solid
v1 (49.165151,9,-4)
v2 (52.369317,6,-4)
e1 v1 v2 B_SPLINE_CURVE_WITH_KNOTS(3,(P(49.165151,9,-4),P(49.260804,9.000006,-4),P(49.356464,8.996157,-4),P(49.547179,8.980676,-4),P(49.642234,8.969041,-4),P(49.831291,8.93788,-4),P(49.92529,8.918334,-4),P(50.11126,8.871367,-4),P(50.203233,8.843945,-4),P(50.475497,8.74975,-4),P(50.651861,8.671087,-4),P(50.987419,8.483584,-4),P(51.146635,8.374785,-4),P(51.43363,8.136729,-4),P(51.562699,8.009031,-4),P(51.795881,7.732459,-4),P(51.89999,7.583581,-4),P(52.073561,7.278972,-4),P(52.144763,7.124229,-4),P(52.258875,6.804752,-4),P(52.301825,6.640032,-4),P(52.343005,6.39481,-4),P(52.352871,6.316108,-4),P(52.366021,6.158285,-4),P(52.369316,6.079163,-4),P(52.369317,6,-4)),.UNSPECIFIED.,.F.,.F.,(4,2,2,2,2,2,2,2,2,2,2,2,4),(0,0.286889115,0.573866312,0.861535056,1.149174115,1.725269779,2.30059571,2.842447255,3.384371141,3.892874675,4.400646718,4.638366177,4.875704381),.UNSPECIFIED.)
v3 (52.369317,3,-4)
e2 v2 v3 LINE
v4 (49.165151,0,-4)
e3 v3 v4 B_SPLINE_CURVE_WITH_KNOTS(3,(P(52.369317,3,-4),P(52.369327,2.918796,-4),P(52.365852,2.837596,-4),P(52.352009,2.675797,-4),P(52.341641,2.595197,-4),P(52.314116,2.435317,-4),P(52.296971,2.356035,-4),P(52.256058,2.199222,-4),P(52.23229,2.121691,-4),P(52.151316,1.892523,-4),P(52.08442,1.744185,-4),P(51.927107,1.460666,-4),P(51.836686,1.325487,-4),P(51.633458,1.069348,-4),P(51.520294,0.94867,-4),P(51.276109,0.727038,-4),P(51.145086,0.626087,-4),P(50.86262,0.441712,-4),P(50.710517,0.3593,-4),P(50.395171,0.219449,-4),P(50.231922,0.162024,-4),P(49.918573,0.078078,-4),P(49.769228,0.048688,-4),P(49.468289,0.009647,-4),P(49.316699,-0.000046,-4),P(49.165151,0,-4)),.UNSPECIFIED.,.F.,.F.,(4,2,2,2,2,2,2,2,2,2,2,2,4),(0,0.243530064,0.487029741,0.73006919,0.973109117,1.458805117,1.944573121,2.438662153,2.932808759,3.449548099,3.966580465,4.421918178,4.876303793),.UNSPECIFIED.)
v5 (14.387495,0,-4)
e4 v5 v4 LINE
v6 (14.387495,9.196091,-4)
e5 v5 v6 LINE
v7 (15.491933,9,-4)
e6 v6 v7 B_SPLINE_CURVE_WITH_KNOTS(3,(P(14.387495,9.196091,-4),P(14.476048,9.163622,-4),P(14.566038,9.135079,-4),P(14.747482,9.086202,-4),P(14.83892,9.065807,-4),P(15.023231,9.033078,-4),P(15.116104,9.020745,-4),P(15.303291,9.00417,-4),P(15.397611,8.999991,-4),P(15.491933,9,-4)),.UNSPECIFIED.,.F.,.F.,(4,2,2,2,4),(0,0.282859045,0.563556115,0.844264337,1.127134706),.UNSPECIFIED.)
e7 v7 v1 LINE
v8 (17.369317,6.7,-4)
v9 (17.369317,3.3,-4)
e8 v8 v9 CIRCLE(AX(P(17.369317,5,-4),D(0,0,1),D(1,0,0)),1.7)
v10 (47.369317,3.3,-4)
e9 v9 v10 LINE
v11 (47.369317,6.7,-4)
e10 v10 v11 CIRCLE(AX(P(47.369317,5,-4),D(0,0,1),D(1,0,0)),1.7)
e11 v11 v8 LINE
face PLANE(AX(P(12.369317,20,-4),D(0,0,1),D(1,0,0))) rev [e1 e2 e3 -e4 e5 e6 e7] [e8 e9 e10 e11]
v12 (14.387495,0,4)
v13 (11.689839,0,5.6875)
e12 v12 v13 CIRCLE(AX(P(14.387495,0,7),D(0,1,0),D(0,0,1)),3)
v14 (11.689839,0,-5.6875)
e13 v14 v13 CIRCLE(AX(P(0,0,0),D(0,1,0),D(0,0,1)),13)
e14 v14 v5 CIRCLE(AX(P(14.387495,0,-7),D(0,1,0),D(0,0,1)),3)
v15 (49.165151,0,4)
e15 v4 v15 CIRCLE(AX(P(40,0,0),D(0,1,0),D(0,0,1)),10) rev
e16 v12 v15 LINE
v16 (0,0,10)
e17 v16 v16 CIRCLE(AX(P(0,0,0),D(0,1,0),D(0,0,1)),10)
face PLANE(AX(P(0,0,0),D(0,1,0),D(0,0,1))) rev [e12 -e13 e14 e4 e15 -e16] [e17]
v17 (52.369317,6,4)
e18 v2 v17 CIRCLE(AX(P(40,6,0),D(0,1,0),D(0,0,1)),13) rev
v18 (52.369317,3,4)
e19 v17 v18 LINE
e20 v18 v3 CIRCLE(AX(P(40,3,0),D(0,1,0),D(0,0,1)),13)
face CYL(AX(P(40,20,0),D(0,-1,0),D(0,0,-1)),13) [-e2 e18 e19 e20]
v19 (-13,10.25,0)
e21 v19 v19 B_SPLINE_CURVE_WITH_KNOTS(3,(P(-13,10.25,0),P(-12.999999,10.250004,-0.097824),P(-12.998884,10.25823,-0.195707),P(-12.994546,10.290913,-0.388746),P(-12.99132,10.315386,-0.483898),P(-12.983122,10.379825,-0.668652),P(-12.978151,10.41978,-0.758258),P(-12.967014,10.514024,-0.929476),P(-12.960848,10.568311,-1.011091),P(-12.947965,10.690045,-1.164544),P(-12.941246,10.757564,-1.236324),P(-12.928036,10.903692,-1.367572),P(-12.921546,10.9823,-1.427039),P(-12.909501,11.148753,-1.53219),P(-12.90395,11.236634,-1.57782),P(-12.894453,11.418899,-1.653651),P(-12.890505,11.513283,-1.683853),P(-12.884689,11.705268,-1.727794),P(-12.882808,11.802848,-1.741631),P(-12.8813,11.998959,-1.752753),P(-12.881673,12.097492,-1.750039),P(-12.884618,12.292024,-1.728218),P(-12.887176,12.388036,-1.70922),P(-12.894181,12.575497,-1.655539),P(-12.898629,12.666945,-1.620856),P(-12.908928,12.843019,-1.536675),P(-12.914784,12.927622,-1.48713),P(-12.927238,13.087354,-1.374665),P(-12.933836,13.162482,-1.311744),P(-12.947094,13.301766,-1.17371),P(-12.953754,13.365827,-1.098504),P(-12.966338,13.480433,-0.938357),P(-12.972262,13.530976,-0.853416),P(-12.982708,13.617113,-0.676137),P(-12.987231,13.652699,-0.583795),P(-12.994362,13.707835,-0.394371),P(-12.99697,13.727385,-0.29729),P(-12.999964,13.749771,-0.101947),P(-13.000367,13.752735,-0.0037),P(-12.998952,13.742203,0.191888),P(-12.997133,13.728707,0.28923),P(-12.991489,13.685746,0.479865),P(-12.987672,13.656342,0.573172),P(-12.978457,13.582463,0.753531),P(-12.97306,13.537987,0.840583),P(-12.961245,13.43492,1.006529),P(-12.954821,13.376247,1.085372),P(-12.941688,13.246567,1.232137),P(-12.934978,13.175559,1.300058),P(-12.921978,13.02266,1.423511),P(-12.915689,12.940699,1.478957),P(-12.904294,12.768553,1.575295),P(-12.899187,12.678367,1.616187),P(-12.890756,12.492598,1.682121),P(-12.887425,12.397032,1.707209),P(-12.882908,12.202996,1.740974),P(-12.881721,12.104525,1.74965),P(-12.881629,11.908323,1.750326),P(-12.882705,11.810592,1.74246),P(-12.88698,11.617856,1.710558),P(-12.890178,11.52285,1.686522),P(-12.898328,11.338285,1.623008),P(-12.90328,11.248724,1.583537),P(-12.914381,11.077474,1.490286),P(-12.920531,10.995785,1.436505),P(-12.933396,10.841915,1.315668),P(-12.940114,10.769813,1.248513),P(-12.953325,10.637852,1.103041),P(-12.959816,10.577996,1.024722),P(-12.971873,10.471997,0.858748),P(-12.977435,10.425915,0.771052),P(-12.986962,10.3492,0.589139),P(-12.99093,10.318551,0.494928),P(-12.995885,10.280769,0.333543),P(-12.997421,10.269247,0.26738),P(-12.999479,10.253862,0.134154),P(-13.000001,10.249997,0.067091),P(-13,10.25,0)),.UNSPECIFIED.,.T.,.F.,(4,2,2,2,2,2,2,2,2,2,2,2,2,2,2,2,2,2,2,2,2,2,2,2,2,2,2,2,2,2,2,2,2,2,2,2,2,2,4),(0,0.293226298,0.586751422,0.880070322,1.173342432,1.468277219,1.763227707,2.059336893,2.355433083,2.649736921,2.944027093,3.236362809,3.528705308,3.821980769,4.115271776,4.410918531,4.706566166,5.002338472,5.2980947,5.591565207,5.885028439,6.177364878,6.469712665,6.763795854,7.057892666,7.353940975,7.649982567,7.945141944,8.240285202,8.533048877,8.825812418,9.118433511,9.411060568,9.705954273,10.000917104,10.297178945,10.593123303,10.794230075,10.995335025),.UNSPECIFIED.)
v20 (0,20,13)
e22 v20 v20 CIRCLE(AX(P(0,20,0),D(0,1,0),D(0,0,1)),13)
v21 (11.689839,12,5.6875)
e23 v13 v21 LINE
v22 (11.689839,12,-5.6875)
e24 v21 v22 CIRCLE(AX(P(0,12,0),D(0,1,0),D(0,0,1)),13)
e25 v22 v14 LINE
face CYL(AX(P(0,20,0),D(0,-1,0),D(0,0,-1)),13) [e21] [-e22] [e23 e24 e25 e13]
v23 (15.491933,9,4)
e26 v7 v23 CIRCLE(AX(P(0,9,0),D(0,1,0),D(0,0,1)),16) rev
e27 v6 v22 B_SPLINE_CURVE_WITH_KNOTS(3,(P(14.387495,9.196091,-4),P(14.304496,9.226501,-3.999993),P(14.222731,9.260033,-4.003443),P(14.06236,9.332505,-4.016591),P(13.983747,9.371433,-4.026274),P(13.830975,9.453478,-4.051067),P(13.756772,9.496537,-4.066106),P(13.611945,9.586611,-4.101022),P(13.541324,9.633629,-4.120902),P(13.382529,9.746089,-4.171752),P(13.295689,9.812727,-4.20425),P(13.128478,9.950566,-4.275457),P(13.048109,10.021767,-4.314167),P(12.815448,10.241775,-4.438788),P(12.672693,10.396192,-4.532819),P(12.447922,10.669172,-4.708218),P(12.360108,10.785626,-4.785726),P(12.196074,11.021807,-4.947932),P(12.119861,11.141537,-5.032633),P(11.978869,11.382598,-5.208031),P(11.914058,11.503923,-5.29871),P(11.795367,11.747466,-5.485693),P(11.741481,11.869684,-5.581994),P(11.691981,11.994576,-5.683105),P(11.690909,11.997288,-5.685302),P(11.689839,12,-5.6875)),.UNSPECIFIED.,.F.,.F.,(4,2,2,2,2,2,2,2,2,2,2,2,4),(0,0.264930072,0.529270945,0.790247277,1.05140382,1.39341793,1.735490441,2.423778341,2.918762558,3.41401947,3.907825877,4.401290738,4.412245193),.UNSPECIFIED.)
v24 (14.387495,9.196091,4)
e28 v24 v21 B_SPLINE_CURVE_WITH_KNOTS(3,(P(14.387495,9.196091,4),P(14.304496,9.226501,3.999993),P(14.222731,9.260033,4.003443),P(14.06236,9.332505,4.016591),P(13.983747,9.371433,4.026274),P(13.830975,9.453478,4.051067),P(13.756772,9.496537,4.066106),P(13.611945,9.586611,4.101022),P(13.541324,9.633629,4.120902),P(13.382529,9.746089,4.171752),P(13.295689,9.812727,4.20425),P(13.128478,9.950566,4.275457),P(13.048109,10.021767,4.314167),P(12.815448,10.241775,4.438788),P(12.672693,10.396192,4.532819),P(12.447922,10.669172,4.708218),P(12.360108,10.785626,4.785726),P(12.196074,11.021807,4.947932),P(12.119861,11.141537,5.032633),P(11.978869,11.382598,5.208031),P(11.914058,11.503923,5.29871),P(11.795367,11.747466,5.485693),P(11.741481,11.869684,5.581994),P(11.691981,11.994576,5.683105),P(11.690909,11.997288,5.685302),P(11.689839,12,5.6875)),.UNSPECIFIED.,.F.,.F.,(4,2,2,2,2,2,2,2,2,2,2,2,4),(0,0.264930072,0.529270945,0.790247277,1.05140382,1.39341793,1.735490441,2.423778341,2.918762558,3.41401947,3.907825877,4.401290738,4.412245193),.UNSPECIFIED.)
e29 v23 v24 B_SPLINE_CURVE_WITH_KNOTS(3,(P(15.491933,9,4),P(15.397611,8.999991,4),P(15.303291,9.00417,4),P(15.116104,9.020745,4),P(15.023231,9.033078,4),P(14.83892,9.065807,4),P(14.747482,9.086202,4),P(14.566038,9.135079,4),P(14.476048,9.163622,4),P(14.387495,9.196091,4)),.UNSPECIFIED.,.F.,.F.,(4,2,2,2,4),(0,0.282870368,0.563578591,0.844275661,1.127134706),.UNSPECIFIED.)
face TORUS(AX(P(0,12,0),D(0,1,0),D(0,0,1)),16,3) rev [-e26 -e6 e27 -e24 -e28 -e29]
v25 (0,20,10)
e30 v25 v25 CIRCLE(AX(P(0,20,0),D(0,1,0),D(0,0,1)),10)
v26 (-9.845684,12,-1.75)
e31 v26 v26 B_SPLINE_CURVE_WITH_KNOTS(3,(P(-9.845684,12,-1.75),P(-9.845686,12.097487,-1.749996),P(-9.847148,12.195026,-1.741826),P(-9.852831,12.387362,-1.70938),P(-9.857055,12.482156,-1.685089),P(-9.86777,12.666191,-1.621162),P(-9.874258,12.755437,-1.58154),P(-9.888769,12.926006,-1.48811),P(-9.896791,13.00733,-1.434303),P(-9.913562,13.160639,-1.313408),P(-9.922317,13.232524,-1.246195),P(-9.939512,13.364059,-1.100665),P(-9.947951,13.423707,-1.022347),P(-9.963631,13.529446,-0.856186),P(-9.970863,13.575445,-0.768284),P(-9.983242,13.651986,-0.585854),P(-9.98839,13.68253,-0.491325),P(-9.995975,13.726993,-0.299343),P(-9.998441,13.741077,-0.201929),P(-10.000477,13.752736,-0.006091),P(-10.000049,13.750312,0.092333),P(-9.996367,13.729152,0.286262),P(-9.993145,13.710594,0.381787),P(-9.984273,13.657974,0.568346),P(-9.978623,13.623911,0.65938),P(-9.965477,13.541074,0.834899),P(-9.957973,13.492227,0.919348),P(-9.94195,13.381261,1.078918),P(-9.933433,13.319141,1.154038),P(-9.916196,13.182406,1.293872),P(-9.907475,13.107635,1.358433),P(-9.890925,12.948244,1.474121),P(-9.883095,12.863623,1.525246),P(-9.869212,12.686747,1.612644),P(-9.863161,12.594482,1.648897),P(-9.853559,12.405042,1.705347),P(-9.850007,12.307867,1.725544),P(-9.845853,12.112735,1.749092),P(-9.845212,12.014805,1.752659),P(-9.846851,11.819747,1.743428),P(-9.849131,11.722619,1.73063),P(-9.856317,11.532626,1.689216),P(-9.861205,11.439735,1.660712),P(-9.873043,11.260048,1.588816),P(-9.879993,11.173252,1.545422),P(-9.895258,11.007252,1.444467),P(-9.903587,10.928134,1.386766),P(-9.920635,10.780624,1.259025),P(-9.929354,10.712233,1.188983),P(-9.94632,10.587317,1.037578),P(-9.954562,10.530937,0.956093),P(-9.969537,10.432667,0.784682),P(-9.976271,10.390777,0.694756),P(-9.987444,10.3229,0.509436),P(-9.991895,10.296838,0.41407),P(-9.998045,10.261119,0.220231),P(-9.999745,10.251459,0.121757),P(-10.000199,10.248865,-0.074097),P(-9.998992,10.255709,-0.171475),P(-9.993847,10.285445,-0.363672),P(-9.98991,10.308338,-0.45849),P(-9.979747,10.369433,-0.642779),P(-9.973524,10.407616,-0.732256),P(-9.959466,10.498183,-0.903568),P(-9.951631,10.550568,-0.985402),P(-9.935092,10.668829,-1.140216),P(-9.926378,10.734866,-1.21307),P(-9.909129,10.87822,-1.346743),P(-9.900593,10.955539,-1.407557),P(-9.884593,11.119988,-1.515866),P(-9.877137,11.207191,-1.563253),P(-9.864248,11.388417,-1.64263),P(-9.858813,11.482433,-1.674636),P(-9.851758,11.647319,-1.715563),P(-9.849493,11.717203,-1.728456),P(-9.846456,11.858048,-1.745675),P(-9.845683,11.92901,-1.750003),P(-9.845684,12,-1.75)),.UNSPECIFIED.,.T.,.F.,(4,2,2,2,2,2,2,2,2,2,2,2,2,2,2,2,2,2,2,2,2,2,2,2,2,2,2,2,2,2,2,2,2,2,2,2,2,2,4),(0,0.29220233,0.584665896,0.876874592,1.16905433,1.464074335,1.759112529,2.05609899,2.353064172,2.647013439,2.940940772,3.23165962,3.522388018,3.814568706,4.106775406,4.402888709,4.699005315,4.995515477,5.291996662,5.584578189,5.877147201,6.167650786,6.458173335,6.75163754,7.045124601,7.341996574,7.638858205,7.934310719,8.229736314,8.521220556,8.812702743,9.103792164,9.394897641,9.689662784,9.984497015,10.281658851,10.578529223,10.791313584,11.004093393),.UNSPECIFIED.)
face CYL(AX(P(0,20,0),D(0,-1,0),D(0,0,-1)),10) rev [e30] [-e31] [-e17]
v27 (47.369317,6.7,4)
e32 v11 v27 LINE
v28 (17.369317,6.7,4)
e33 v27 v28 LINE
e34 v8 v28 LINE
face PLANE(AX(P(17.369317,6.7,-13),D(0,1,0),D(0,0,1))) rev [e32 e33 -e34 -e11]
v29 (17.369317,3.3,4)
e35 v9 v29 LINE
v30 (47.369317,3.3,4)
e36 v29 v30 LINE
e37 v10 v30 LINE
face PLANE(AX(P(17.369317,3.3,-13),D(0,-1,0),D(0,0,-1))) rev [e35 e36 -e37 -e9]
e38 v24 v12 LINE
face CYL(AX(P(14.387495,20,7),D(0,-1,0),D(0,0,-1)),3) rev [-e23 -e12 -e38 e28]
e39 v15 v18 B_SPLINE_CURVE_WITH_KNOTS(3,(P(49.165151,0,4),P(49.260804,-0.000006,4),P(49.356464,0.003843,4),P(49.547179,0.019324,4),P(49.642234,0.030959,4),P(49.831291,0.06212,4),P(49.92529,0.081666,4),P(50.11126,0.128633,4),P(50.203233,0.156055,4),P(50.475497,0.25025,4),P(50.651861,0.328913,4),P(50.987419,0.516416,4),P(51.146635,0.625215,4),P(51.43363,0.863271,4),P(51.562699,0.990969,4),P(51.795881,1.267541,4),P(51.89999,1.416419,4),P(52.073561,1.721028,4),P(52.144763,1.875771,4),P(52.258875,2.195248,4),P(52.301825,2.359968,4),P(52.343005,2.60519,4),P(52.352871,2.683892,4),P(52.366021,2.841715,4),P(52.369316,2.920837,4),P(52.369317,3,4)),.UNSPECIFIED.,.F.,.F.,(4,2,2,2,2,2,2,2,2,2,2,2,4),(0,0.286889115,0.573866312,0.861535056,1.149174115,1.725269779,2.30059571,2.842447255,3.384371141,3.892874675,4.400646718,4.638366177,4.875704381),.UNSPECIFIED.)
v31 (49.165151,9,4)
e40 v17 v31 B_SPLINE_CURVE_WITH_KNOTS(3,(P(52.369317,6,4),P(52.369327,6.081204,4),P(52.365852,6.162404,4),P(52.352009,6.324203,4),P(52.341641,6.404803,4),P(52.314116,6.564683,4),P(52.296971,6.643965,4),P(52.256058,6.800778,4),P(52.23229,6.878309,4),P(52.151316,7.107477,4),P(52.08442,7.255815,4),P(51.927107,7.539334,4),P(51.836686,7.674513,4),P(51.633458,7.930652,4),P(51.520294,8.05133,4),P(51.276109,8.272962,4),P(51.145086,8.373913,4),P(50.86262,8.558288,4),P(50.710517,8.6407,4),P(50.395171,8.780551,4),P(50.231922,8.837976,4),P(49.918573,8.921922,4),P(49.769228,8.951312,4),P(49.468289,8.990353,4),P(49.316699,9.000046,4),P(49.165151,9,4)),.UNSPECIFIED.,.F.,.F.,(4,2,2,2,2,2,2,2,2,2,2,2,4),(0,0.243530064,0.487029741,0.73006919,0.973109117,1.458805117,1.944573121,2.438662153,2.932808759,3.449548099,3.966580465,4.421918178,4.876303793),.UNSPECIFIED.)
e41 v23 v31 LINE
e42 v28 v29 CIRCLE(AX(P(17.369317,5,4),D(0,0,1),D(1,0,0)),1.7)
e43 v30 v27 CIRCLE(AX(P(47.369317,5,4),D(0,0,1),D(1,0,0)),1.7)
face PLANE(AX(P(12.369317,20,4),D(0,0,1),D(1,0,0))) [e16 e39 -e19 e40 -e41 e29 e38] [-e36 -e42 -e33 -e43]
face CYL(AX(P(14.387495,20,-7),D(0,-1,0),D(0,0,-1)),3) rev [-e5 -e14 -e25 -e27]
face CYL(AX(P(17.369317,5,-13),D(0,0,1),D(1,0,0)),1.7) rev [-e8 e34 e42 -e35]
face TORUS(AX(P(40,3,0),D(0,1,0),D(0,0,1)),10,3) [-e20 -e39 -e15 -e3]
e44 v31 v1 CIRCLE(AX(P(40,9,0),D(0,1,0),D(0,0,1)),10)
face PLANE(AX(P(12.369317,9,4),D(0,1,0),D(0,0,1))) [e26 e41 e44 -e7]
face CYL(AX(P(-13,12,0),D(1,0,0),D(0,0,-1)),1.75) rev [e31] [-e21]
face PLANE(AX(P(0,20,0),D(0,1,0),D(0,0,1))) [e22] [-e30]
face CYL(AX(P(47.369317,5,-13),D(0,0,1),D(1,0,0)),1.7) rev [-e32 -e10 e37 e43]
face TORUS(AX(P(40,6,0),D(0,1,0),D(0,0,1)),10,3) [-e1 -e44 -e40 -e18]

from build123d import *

# Parameters (mm, degrees)
SKETCH_1_R          = 13
SKETCH_1_R_2        = 10
EXTRUDE_1_DEPTH     = 20
EXTRUDE_2_DEPTH     = 9
CUT_EXTRUDE_1_DEPTH = 60.14389233
FILLET_1_R          = 3
SKETCH_4_R          = 1.75
CUT_EXTRUDE_2_DEPTH = 59.120564438


# Read off the part's stored shape, not the designer's step: 凸台-拉伸2
with BuildPart() as part:
    # 草图1 → 凸台-拉伸1 (new body)
    with BuildSketch(Plane(origin=(0, 0, 0), x_dir=(1, 0, 0), z_dir=(0, 1, 0))):
        with Locations(Location((0, 0, 0), (0, 0, 270))):
            Circle(SKETCH_1_R)
        with Locations(Location((0, 0, 0), (0, 0, 270))):
            Circle(SKETCH_1_R_2, mode=Mode.SUBTRACT)
    extrude(amount=EXTRUDE_1_DEPTH)

    # 凸台-拉伸2 outline → 凸台-拉伸2 (add)
    with BuildSketch(Plane(origin=(0, 0, 0), x_dir=(1, 0, 0), z_dir=(0, 1, 0))):
        with BuildLine():
            ThreePointArc((52.369316877, -4), (53, 0), (52.369316877, 4))
            Line((52.369316877, 4), (12.369316877, 4))
            ThreePointArc((12.369316877, 4), (13, 0), (12.369316877, -4))
            Line((12.369316877, -4), (52.369316877, -4))
        make_face()
    extrude(amount=EXTRUDE_2_DEPTH)

    # 草图3 → 切除-拉伸1 (cut, through all)
    with BuildSketch(Plane.XY.offset(4)):
        with BuildLine():
            Line((17.369316877, 6.7), (47.369316877, 6.7))
            ThreePointArc((47.369316877, 6.7), (49.069316877, 5), (47.369316877, 3.3))
            Line((47.369316877, 3.3), (17.369316877, 3.3))
            ThreePointArc((17.369316877, 3.3), (15.669316877, 5), (17.369316877, 6.7))
        make_face()
    extrude(amount=-CUT_EXTRUDE_1_DEPTH, mode=Mode.SUBTRACT)

    # 圆角1
    fillet_1_edges = [part.edges().sort_by_distance(p)[0] for p in [
        (53, 9, 0),
        (53, 0, 0),
        (12.369316877, 4.5, -4),
        (13, 9, 0),
        (12.369316877, 4.5, 4),
    ]]
    fillet(fillet_1_edges, radius=FILLET_1_R)

    # 草图4 → 切除-拉伸2 (cut, through all)
    with BuildSketch(Plane(origin=(0, 0, 0), x_dir=(0, 0, -1), z_dir=(1, 0, 0))):
        with Locations((0, 12)):
            Circle(SKETCH_4_R)
    extrude(amount=-CUT_EXTRUDE_2_DEPTH, mode=Mode.SUBTRACT)


solid = part.part
